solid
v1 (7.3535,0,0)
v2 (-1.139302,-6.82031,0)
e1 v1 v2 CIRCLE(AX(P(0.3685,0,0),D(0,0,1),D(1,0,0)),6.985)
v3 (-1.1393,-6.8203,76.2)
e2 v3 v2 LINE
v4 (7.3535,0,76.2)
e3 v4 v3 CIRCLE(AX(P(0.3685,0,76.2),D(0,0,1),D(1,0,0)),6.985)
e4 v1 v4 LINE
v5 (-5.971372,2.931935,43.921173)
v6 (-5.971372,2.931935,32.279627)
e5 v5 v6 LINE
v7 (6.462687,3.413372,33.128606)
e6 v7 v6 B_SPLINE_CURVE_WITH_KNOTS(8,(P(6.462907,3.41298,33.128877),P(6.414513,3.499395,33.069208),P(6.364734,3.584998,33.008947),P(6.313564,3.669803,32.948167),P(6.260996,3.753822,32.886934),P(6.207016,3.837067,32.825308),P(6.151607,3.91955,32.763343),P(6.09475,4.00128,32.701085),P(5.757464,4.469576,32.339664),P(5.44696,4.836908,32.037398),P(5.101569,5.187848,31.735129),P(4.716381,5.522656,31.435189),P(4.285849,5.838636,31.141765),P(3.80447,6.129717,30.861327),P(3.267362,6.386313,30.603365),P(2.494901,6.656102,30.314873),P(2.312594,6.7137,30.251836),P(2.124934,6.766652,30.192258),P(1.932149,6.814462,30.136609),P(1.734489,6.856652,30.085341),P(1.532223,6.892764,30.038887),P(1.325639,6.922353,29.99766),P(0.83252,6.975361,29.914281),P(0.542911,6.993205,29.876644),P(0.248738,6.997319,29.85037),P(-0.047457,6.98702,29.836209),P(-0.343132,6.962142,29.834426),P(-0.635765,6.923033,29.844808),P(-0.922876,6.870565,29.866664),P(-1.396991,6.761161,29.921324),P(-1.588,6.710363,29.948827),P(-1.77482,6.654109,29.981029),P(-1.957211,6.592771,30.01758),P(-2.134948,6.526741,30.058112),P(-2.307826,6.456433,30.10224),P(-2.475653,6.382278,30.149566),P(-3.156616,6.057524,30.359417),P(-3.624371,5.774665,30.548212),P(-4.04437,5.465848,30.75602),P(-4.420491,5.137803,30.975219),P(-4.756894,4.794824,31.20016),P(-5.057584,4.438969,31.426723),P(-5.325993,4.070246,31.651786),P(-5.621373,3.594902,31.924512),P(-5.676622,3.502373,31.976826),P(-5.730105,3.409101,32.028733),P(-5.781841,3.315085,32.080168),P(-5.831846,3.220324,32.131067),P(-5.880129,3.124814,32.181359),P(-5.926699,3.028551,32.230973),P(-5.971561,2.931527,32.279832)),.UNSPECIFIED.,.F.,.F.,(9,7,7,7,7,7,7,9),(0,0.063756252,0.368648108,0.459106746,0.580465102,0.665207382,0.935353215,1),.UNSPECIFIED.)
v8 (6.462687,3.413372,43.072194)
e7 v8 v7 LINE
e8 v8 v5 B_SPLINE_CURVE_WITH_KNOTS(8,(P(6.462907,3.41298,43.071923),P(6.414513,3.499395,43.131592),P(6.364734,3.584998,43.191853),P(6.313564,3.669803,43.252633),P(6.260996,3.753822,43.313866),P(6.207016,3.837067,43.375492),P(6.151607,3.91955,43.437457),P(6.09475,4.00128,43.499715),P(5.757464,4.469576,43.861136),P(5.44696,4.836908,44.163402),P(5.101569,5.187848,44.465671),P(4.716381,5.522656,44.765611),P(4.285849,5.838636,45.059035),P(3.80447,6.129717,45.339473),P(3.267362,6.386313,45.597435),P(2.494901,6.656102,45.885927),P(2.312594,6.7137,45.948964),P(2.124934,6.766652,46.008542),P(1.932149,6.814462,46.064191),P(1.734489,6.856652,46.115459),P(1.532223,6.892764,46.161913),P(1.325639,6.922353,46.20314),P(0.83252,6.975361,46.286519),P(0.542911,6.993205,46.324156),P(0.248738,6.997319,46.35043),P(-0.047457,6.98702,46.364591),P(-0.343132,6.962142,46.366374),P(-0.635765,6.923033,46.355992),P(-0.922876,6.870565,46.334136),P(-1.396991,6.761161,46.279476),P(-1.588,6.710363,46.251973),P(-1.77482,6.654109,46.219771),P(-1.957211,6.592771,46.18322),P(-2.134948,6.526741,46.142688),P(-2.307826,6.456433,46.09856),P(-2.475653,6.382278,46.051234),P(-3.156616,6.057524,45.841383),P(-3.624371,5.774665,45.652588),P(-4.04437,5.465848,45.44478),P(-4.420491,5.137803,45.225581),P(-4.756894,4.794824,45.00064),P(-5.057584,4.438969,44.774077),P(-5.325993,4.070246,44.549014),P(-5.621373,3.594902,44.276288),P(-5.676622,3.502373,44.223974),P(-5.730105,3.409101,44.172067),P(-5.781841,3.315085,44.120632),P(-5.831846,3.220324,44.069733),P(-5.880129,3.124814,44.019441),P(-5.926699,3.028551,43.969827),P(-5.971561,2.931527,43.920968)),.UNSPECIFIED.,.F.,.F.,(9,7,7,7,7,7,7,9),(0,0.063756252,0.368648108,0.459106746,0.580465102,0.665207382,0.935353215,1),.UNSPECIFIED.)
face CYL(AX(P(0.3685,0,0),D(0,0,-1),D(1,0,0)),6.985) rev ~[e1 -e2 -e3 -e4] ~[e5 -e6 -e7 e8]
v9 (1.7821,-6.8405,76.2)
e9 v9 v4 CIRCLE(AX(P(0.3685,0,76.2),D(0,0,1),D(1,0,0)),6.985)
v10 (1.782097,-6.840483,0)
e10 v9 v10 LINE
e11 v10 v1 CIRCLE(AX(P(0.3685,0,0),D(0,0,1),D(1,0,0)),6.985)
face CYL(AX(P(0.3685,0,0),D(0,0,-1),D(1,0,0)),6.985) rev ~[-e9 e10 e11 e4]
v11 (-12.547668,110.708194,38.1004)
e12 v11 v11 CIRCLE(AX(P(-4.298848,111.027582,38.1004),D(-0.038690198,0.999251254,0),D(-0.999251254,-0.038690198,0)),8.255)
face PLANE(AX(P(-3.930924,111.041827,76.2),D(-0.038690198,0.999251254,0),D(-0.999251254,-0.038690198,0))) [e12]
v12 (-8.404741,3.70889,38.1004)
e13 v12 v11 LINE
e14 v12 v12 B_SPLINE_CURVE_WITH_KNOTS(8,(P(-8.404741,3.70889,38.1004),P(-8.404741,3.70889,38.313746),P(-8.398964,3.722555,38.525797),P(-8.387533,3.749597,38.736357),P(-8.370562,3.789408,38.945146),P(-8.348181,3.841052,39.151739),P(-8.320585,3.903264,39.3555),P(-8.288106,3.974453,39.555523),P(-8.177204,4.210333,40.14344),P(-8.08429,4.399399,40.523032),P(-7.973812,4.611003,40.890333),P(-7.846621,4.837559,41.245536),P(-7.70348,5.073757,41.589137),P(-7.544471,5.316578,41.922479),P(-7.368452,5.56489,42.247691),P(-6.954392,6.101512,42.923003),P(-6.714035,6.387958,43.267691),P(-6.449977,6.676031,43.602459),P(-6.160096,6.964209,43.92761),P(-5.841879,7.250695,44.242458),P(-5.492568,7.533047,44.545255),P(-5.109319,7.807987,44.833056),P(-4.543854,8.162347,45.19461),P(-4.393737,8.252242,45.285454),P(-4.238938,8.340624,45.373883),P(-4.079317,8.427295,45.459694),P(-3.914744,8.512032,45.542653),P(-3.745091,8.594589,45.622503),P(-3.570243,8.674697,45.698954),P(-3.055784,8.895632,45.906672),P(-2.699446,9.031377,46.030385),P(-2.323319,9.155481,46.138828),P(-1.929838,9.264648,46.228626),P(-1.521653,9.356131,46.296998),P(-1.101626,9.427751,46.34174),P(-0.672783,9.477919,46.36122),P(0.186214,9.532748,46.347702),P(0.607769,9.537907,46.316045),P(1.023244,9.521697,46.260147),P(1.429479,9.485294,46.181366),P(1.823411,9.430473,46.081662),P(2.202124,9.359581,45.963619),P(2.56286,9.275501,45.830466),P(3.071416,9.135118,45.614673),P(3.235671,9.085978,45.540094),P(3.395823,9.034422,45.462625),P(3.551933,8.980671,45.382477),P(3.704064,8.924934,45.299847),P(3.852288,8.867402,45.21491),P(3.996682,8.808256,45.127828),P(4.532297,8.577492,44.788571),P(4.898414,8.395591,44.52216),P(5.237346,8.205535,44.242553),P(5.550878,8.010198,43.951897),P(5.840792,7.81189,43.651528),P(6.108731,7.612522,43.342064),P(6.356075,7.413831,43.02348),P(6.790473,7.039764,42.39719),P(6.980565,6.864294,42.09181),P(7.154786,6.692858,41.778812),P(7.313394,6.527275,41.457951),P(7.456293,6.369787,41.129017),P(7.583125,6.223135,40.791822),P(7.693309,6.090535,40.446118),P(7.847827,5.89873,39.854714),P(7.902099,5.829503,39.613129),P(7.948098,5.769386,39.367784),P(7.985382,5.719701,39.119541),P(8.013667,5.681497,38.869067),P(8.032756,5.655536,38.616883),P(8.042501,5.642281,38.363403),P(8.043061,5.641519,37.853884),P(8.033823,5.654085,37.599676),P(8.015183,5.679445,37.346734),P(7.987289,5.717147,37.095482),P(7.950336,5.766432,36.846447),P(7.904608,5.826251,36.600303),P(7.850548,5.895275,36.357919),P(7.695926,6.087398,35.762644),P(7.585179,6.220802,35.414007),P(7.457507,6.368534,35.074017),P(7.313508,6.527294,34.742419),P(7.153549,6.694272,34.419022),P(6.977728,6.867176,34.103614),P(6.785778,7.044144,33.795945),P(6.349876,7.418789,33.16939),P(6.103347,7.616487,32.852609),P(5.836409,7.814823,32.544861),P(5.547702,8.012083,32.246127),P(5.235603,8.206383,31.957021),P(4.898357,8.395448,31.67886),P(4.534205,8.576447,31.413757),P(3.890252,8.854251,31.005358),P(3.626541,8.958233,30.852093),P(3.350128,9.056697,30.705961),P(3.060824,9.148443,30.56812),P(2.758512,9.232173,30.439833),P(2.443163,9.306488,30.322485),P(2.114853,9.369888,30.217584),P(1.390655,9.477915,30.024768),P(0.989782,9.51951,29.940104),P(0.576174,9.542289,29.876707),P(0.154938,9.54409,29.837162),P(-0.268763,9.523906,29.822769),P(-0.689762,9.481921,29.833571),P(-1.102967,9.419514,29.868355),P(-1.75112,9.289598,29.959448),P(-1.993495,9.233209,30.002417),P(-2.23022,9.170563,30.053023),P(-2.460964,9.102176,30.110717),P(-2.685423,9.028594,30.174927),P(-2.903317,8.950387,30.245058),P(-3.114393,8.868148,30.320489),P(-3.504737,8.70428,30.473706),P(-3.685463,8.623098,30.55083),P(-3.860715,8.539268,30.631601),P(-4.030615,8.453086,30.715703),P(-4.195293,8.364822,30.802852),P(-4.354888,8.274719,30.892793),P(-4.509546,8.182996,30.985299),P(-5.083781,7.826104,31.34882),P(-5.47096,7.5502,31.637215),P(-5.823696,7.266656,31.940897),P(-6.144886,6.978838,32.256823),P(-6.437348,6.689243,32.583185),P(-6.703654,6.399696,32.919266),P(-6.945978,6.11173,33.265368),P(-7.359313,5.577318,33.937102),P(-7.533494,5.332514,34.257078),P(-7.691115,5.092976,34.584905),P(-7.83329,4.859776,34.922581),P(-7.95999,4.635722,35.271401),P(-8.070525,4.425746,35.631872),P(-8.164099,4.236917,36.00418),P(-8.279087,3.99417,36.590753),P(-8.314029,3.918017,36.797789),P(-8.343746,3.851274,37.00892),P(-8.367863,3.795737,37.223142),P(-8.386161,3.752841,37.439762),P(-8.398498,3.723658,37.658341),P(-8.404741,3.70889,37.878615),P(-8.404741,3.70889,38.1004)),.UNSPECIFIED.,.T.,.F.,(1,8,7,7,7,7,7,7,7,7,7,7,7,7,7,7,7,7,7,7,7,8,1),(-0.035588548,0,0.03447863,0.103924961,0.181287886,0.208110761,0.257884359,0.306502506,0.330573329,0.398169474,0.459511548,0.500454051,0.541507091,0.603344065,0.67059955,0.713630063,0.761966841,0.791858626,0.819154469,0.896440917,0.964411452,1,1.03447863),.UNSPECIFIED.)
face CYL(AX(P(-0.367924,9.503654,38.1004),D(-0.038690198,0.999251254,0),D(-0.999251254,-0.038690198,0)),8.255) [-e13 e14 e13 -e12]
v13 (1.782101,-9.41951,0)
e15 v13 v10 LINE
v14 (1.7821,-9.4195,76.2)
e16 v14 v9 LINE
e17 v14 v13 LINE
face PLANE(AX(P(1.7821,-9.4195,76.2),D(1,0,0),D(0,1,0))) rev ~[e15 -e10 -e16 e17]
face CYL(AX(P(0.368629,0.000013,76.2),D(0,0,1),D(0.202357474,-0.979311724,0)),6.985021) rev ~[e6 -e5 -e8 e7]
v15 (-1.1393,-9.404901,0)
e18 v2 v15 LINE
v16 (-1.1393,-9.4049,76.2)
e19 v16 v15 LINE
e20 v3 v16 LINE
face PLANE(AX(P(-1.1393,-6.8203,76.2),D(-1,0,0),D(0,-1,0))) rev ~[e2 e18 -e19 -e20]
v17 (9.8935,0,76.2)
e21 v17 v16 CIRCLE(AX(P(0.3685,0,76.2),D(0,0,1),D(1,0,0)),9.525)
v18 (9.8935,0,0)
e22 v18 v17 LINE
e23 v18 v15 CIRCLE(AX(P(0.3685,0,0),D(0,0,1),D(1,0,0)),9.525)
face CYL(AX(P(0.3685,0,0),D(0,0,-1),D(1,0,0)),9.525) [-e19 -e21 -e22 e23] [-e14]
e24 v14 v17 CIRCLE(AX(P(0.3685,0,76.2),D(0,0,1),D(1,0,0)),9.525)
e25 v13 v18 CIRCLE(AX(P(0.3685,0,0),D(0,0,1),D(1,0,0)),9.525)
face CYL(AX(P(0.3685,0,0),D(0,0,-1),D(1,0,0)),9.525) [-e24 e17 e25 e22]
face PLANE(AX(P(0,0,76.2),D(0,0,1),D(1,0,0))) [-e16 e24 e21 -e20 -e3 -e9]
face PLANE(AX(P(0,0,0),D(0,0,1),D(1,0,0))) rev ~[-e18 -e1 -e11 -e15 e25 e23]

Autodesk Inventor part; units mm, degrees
ref_plane "YZ Plane" through (0, 0, 0) normal (1, 0, 0) x (0, 1, 0)
ref_plane "XZ Plane" through (0, 0, 0) normal (0, 1, 0) x (-1, 0, 0)
sketch "Sketch1" plane through (0, 0, 0) normal (0, 0, 1) x (1, 0, 0)
  circle A0 centre (0.3685, 0) radius 9.525
  circle A1 centre (0.3685, 0) radius 6.985
  point P0 (0, 0)
  dimension "d0" = 19.05
  dimension "d1" = 2.54
extrude "Extrusion1" add sketch "Sketch1" along normal blind 76.2
sketch "Sketch2" plane through (0.3685, 0, 76.2) normal (0, 0, 1) x (1, 0, 0)
  circle A0 centre (0, 0) radius 6.985 projected
  circle A1 centre (0, 0) radius 9.525 projected
  point P0 (-0.3685, 0)
  point P1 (-0.3685, 9.5179)
ref_plane "Work Plane1" through (0, 9.5179, 76.2) normal (-0.0386902, 0.9992513, 0) x (-0.9992513, -0.0386902, 0)
sketch "Sketch3" plane through (0, 9.5179, 76.2) normal (-0.0386902, 0.9992513, 0) x (-0.9992513, -0.0386902, 0)
  line L0 (0.3682, 0.0009) -> (0.3682, -76.2) construction
  circle A0 centre (0.3682, -38.0996) radius 8.255
  dimension "d4" = 16.51
extrude "Extrusion2" add sketch "Sketch3" along normal blind 101.6 and the other way blind 6.35
sketch "Sketch4" plane through (0.3685, 0, 76.2) normal (0, 0, 1) x (1, 0, 0)
  line L0 (-1.5078, -6.8203) -> (-1.5078, -9.4049)
  line L1 (1.4136, -9.4195) -> (1.4136, -6.8405)
  arc A0 (-1.5078, -9.4049) -> (1.4136, -9.4195) centre (0, 0) ccw
  arc A1 (1.4136, -6.8405) -> (-1.5078, -6.8203) centre (0, 0) ccw
extrude "Extrusion3" cut sketch "Sketch4" against normal blind 101.6
properties part number "centerSpike" material "Iron, Cast"
